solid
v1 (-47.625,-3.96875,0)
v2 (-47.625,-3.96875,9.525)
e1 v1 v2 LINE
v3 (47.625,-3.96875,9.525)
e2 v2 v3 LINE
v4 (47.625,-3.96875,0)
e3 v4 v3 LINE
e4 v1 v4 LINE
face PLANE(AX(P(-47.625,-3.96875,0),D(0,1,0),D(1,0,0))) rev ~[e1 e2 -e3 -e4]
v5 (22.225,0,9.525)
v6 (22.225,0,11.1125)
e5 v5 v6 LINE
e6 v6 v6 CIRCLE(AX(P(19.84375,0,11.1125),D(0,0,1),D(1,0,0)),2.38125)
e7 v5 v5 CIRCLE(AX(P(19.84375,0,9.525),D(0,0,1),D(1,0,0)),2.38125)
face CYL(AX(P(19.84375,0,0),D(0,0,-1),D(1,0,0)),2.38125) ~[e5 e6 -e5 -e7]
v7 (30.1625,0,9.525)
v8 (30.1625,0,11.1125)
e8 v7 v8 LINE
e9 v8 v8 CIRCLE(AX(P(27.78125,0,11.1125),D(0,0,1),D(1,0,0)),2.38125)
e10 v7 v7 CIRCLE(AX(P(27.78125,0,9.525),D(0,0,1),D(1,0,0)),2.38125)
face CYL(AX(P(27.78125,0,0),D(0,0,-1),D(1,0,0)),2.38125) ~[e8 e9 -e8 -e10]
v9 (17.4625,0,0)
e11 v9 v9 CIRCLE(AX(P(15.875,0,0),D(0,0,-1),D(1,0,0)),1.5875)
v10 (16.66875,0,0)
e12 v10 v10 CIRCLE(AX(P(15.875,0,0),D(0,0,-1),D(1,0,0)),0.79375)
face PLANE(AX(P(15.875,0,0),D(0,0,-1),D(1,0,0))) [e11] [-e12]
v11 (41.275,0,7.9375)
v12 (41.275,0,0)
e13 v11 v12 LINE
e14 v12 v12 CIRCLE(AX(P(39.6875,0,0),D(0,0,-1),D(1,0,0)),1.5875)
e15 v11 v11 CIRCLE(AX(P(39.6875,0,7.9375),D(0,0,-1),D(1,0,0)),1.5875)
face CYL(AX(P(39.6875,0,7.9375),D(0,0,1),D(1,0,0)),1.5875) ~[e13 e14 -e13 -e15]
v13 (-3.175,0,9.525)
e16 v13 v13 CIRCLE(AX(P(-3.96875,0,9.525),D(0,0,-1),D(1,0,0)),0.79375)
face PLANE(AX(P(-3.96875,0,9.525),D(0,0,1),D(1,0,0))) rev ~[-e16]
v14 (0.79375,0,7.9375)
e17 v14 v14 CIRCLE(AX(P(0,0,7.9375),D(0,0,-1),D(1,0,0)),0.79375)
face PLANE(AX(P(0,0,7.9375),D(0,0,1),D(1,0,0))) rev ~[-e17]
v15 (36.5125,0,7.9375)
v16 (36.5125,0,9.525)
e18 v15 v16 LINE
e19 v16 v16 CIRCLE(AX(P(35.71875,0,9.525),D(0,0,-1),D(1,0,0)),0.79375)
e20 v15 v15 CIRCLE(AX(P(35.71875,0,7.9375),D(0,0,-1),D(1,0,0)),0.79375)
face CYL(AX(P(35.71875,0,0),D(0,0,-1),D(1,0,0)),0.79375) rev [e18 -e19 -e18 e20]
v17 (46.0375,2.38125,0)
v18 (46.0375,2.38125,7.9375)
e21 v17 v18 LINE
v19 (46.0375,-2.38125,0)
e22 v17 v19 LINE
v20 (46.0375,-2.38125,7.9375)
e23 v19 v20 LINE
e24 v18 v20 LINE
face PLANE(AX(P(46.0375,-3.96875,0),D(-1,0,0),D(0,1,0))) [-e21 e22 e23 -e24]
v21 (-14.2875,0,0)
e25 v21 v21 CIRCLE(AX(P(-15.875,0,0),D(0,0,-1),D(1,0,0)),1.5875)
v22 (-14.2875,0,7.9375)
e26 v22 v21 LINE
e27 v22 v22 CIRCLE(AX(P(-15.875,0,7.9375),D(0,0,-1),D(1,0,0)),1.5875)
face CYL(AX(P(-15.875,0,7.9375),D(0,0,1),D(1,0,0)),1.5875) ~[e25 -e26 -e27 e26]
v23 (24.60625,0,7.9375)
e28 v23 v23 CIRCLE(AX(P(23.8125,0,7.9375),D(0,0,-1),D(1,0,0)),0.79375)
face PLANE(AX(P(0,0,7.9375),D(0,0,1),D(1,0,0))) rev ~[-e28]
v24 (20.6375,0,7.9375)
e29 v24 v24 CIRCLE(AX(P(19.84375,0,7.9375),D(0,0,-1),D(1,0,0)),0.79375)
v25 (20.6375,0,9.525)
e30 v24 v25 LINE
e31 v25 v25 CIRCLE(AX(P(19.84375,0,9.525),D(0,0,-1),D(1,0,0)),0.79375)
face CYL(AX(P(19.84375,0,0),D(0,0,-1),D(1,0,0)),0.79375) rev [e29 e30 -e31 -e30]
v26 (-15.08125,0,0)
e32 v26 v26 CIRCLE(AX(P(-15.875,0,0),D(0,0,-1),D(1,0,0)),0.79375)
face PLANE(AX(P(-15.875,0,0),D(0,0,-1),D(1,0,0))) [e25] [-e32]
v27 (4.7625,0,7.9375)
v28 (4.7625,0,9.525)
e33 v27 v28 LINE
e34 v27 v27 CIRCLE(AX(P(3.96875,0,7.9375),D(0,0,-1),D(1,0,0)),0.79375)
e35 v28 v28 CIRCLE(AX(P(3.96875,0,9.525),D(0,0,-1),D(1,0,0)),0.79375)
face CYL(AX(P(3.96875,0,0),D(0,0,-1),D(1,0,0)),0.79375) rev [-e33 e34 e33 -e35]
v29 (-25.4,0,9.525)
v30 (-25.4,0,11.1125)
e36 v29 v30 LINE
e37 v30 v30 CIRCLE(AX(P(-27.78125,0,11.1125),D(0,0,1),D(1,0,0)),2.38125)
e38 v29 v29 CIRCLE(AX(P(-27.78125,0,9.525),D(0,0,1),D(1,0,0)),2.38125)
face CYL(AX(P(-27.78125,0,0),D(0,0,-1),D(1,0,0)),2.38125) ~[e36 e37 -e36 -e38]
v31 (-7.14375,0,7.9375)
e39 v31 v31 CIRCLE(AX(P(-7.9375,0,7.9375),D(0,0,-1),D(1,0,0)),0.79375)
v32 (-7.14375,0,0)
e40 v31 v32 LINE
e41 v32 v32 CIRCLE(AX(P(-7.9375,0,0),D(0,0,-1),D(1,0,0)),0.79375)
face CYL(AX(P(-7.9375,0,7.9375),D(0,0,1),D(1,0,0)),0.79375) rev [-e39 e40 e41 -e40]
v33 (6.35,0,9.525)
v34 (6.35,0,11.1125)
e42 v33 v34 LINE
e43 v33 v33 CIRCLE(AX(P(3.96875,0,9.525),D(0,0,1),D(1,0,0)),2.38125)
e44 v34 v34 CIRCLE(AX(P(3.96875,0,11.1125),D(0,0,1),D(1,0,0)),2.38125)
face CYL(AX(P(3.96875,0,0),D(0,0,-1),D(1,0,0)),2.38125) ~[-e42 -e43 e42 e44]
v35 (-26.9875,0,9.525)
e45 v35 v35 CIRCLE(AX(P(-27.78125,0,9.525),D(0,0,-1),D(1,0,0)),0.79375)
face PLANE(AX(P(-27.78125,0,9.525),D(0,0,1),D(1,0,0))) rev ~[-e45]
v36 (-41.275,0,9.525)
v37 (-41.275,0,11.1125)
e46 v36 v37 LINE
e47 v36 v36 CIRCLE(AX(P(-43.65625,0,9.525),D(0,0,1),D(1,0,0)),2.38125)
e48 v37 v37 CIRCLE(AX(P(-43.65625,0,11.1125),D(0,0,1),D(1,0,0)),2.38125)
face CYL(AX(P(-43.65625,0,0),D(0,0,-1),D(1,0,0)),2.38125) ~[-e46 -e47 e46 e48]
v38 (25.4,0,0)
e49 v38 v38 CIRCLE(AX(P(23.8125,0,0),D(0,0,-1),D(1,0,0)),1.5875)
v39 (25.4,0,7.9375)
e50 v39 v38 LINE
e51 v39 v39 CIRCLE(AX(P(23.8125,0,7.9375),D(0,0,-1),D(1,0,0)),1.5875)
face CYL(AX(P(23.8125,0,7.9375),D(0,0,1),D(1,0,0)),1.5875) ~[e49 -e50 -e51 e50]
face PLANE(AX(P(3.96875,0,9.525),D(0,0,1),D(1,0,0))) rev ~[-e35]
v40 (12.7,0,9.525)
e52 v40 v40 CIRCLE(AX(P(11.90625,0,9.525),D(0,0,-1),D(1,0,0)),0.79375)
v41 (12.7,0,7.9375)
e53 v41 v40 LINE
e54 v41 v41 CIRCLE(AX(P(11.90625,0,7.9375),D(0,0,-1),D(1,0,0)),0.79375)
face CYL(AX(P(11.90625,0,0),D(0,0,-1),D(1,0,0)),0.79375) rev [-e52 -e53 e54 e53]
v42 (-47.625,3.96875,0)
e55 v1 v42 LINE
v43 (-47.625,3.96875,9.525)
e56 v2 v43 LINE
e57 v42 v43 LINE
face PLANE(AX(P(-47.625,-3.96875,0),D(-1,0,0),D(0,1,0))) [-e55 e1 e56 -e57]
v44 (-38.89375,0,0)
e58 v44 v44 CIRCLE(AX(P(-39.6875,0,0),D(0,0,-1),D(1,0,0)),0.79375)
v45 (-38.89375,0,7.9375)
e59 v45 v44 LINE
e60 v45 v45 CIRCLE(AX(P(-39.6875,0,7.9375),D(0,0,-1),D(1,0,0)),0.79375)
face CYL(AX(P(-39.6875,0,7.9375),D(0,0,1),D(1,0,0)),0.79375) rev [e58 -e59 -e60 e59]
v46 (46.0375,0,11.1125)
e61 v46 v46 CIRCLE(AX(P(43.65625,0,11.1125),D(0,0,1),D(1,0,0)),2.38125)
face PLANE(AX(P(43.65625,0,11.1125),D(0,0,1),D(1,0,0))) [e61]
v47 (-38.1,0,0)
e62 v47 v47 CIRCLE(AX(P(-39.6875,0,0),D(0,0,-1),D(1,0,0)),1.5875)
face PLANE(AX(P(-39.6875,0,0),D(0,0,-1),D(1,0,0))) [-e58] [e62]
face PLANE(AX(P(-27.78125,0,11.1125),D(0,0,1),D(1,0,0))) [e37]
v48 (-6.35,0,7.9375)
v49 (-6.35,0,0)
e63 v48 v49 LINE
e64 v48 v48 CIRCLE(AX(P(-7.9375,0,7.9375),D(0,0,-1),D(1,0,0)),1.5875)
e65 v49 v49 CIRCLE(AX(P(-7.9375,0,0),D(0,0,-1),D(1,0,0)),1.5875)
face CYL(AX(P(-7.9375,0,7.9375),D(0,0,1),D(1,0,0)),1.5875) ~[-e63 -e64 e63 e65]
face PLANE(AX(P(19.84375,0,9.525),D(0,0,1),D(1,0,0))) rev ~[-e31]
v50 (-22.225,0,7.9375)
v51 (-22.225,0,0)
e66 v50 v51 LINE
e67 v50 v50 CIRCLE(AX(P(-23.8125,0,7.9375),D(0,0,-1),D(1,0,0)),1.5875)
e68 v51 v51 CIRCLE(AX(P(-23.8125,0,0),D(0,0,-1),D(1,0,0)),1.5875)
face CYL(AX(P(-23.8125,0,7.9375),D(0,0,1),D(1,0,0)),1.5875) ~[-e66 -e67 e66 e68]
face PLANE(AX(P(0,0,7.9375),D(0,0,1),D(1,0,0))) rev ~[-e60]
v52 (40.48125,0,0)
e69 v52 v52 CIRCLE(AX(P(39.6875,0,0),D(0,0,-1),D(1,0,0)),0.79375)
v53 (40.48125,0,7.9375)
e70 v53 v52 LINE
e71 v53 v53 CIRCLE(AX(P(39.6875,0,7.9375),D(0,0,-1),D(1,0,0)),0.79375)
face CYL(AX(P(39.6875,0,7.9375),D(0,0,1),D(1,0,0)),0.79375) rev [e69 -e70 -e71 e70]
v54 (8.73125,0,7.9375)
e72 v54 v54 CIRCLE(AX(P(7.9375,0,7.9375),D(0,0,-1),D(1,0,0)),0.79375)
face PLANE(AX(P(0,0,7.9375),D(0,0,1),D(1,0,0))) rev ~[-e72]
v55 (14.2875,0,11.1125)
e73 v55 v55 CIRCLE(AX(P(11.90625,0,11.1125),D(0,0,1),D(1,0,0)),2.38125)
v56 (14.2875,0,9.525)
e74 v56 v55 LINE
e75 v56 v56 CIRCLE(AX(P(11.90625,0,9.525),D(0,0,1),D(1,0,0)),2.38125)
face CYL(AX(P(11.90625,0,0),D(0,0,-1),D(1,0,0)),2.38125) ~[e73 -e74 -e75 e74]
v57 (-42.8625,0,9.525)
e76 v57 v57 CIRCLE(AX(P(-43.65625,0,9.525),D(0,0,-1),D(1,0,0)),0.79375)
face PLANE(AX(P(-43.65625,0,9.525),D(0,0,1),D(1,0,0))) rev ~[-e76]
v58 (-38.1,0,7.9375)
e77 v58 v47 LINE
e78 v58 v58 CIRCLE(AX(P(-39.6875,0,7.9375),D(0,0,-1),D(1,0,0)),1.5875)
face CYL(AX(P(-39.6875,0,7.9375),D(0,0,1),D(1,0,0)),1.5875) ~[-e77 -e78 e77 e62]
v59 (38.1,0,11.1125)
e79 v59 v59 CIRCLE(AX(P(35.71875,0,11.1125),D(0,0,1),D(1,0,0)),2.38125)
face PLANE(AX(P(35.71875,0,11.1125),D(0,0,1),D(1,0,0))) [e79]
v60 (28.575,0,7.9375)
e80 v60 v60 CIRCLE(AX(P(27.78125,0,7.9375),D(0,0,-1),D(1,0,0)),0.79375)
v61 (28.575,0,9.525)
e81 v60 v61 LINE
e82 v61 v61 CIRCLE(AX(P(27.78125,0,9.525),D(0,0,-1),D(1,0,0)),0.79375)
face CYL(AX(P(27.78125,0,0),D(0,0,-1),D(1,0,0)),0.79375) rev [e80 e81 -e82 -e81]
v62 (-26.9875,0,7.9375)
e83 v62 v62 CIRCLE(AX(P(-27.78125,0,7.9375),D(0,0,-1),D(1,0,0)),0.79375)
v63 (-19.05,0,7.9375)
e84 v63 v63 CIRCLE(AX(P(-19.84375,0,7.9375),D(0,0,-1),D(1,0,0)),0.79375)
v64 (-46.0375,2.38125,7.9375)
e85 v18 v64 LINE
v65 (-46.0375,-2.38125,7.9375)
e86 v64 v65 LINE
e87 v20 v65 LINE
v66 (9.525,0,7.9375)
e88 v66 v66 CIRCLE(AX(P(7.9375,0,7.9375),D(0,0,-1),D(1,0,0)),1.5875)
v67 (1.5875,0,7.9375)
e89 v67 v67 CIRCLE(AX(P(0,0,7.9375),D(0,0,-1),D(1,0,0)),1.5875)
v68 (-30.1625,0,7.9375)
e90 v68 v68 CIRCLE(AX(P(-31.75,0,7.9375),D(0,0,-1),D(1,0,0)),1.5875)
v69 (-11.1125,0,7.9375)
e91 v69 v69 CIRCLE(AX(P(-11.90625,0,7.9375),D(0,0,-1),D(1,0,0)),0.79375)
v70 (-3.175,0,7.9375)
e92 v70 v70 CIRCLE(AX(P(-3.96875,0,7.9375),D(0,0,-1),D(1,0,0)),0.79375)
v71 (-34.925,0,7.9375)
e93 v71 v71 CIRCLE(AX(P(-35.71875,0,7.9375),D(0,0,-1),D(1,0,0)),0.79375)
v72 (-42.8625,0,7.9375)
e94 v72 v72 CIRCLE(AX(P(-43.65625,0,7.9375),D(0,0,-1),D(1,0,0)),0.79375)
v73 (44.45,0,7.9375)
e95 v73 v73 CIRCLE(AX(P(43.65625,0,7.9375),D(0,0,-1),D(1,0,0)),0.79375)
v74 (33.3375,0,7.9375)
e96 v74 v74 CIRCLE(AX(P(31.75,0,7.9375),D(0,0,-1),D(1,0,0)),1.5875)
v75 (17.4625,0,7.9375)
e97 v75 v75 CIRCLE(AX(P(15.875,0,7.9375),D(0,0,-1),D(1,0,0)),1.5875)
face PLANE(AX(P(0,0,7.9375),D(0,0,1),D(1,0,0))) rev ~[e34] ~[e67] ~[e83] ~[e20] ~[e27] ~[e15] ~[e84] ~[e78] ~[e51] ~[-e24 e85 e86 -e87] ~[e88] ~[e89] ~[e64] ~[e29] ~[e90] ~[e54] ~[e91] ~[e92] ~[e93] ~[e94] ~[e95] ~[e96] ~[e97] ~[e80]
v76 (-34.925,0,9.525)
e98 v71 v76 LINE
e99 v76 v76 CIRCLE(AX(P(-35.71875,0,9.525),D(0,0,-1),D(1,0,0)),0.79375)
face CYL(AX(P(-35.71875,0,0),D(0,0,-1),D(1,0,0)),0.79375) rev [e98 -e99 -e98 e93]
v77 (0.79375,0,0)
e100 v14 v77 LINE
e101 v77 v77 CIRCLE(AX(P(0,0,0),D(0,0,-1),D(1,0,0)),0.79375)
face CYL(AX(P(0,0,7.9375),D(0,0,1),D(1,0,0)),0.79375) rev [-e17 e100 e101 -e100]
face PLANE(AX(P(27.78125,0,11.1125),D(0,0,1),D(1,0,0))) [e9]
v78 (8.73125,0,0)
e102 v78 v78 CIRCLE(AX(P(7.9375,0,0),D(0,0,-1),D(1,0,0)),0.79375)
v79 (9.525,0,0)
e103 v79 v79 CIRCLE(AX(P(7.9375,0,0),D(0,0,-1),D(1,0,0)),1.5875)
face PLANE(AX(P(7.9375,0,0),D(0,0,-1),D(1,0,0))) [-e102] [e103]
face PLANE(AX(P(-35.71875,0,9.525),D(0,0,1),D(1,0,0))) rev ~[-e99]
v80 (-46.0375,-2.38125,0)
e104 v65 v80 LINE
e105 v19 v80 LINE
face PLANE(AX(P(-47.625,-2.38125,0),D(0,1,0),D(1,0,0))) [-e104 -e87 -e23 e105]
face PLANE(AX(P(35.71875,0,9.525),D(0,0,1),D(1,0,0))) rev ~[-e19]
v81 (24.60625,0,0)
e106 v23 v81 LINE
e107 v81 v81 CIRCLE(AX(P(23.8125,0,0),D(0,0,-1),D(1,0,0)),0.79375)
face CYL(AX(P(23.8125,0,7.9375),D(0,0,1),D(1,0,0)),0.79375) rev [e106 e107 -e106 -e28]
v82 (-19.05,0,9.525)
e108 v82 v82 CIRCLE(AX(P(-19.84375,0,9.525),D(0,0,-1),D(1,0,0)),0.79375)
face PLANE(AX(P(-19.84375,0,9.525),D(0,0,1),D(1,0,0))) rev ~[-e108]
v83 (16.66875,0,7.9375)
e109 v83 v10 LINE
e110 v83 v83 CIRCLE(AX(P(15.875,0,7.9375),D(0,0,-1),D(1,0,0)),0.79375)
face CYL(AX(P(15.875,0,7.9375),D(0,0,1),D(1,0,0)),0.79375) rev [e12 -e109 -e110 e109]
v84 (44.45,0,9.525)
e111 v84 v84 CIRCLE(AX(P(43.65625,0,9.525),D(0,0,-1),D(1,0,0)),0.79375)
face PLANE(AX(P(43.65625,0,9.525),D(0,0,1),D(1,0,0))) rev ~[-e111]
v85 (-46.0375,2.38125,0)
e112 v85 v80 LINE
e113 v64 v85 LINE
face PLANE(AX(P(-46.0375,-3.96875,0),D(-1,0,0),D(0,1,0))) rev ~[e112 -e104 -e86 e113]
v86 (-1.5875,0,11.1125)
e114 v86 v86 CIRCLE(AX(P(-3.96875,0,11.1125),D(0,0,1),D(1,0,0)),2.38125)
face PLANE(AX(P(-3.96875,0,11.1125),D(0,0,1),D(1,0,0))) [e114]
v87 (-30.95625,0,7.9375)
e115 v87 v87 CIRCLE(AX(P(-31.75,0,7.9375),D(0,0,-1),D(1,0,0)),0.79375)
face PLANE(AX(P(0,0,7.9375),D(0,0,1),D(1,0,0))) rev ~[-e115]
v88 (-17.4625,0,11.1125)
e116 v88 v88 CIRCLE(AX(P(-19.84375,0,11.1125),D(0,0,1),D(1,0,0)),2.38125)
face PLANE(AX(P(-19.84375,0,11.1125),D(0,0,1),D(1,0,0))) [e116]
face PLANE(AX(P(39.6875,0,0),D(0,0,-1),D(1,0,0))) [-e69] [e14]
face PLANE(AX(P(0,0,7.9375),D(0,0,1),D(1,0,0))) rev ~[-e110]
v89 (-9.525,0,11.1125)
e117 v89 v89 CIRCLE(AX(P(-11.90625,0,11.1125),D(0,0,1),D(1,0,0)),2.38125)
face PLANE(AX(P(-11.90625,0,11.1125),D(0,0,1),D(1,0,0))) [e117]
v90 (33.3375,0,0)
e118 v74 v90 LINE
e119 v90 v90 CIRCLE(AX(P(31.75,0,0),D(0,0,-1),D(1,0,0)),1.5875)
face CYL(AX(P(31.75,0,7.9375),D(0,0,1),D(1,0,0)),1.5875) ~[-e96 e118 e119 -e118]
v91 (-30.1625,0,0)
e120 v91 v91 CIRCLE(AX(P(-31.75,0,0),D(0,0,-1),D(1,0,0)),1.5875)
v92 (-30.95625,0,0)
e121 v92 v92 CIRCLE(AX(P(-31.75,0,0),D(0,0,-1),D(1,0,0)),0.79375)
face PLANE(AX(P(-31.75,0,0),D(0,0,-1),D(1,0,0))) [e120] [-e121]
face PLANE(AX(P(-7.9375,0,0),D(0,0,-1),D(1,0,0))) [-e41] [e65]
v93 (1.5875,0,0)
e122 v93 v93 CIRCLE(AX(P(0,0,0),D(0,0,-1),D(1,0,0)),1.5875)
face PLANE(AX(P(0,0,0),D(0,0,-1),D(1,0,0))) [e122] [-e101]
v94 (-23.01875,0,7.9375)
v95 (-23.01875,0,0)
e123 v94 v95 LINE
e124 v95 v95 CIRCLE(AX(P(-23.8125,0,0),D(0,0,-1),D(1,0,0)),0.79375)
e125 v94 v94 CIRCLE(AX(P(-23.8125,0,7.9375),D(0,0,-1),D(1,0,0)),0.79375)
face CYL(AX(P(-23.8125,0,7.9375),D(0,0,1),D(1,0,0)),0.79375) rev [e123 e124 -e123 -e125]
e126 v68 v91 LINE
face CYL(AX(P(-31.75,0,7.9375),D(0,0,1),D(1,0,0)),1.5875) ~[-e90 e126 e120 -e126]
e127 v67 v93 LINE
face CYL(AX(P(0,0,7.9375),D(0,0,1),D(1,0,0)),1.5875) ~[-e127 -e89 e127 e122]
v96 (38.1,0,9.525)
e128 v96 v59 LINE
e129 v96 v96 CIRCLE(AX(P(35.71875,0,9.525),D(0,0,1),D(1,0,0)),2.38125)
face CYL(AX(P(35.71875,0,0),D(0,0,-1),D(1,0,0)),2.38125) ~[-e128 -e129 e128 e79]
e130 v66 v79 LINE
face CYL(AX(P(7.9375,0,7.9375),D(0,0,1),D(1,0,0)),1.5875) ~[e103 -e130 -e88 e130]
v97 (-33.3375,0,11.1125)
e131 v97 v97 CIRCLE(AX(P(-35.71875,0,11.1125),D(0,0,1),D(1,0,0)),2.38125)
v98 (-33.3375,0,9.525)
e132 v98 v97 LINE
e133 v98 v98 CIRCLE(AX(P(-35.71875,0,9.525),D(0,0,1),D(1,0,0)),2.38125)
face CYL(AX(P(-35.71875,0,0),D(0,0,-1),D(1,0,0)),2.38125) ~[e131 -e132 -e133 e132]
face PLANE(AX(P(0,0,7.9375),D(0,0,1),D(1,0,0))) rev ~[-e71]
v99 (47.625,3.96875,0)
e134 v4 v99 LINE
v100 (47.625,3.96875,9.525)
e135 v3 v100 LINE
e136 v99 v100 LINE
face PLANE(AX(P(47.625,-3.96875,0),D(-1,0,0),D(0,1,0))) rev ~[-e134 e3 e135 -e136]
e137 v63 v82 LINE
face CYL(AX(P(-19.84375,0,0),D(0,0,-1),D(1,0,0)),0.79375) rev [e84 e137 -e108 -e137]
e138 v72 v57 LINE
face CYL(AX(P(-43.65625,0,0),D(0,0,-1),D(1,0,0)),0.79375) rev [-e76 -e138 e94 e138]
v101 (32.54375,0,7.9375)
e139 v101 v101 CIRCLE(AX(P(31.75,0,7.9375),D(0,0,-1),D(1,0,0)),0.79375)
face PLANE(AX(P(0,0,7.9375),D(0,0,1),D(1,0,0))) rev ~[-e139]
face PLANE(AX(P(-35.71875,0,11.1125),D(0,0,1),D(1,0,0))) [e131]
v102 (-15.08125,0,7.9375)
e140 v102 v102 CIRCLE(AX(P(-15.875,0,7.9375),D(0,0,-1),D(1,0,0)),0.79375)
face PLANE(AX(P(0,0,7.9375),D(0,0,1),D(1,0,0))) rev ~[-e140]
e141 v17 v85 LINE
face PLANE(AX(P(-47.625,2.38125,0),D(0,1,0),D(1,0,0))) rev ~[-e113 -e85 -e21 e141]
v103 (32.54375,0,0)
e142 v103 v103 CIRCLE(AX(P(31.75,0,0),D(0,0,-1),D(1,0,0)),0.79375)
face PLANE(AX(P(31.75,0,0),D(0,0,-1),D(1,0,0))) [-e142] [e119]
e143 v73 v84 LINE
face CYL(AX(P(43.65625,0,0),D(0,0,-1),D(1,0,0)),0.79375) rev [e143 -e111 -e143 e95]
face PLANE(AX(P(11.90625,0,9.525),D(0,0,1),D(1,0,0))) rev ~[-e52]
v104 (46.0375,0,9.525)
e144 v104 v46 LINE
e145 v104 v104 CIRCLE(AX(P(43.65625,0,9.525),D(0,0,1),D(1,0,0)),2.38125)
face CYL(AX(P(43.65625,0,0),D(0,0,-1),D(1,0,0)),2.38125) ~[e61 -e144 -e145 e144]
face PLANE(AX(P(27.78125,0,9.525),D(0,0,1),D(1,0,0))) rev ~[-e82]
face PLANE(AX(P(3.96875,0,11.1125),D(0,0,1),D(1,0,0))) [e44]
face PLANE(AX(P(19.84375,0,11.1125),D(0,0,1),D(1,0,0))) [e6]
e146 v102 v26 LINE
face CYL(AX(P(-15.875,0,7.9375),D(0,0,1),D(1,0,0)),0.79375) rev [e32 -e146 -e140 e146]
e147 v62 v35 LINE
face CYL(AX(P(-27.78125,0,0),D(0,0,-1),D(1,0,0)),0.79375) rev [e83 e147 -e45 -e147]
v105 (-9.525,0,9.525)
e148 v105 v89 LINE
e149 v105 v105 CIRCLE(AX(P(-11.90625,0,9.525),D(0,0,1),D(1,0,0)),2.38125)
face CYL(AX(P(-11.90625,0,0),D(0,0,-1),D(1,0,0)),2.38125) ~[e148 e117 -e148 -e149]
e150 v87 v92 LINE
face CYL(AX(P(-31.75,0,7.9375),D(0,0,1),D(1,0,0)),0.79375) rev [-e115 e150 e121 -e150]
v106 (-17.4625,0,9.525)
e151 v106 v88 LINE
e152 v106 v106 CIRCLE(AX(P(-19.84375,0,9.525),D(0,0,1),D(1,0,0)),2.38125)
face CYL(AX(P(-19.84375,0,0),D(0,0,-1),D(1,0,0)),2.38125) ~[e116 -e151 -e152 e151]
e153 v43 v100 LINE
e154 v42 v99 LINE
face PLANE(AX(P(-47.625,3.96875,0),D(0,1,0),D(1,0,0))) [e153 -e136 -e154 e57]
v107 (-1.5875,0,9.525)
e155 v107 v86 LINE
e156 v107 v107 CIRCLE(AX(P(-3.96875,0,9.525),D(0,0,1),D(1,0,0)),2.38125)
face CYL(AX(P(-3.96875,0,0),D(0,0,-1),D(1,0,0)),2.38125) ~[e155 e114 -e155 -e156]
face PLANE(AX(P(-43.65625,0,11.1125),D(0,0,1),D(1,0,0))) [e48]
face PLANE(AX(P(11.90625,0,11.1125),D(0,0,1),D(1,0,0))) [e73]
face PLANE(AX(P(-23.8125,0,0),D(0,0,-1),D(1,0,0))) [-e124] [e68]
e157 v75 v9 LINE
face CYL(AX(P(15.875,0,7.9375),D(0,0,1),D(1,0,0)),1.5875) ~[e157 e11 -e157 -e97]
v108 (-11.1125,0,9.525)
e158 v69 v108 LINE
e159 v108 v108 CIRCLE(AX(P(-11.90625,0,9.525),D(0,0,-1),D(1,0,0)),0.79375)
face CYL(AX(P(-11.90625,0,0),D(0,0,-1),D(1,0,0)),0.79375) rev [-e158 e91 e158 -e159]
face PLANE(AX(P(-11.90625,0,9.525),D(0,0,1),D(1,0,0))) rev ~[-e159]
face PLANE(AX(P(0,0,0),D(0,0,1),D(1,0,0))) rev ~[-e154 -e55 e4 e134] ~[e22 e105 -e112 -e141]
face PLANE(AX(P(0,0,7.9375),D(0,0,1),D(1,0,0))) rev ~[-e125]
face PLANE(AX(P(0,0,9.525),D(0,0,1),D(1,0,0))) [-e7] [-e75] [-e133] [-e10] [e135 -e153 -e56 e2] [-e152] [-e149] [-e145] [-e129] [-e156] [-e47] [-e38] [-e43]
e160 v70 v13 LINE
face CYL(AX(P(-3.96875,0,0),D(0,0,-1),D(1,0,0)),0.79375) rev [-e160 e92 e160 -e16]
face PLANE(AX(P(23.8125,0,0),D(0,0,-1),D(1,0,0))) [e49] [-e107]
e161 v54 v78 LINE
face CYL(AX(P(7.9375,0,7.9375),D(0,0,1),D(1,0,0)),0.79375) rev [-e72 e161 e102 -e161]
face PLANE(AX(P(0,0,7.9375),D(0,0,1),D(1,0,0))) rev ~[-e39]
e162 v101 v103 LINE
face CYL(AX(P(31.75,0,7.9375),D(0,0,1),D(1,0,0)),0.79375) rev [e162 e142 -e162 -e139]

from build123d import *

# Parameters (mm, degrees)
F0_W     = 95.25
F0_H     = 7.9375
F0_R     = 2.38125
F1_DEPTH = 9.525
F2_DEPTH = 11.1125
F3_T     = -1.5875
F4_R     = 1.5875
F4_R_2   = 0.79375
F5_DEPTH = 7.9375


# Not quite as in the source:
# - a feature names something its author has since deleted; it is built from what else it names


with BuildPart() as f1:
    # F0 (on Top) → F1 (new body)
    with BuildSketch(Plane.XY):
        Rectangle(F0_W, F0_H)
        with Locations((-43.65625, 0)):
            Circle(F0_R, mode=Mode.SUBTRACT)
        with Locations((-35.71875, 0)):
            Circle(F0_R, mode=Mode.SUBTRACT)
        with Locations((-27.78125, 0)):
            Circle(F0_R, mode=Mode.SUBTRACT)
        with Locations((-19.84375, 0)):
            Circle(F0_R, mode=Mode.SUBTRACT)
        with Locations((-11.90625, 0)):
            Circle(F0_R, mode=Mode.SUBTRACT)
        with Locations((-3.96875, 0)):
            Circle(F0_R, mode=Mode.SUBTRACT)
        with Locations((3.96875, 0)):
            Circle(F0_R, mode=Mode.SUBTRACT)
        with Locations((11.90625, 0)):
            Circle(F0_R, mode=Mode.SUBTRACT)
        with Locations((19.84375, 0)):
            Circle(F0_R, mode=Mode.SUBTRACT)
        with Locations((27.78125, 0)):
            Circle(F0_R, mode=Mode.SUBTRACT)
        with Locations((35.71875, 0)):
            Circle(F0_R, mode=Mode.SUBTRACT)
        with Locations((43.65625, 0)):
            Circle(F0_R, mode=Mode.SUBTRACT)
    extrude(amount=F1_DEPTH)

    # F0 (on Top) → F2 (join)
    with BuildSketch(Plane.XY):
        with Locations((-43.65625, 0)):
            Circle(F0_R)
        with Locations((-35.71875, 0)):
            Circle(F0_R)
        with Locations((-27.78125, 0)):
            Circle(F0_R)
        with Locations((-19.84375, 0)):
            Circle(F0_R)
        with Locations((-11.90625, 0)):
            Circle(F0_R)
        with Locations((-3.96875, 0)):
            Circle(F0_R)
        with Locations((3.96875, 0)):
            Circle(F0_R)
        with Locations((11.90625, 0)):
            Circle(F0_R)
        with Locations((19.84375, 0)):
            Circle(F0_R)
        with Locations((27.78125, 0)):
            Circle(F0_R)
        with Locations((35.71875, 0)):
            Circle(F0_R)
        with Locations((43.65625, 0)):
            Circle(F0_R)
    extrude(amount=F2_DEPTH)

    # F3
    f3_openings = [f1.faces().sort_by_distance(p)[0] for p in [
        (0, 0, 0),
    ]]
    offset(amount=F3_T, openings=f3_openings, kind=Kind.INTERSECTION)

    # F4 (on face) → F5 (join)
    with BuildSketch(Plane(origin=(0, 0, 7.9375), x_dir=(1, 0, 0), z_dir=(0, 0, -1))):
        with Locations((-39.6875, 0)):
            Circle(F4_R)
        with Locations((-39.6875, 0)):
            Circle(F4_R_2, mode=Mode.SUBTRACT)
        with Locations((-31.75, 0)):
            Circle(F4_R)
        with Locations((-31.75, 0)):
            Circle(F4_R_2, mode=Mode.SUBTRACT)
        with Locations((-23.8125, 0)):
            Circle(F4_R)
        with Locations((-23.8125, 0)):
            Circle(F4_R_2, mode=Mode.SUBTRACT)
        with Locations((-15.875, 0)):
            Circle(F4_R)
        with Locations((-15.875, 0)):
            Circle(F4_R_2, mode=Mode.SUBTRACT)
        with Locations((-7.9375, 0)):
            Circle(F4_R)
        with Locations((-7.9375, 0)):
            Circle(F4_R_2, mode=Mode.SUBTRACT)
        Circle(F4_R)
        Circle(F4_R_2, mode=Mode.SUBTRACT)
        with Locations((7.9375, 0)):
            Circle(F4_R)
        with Locations((7.9375, 0)):
            Circle(F4_R_2, mode=Mode.SUBTRACT)
        with Locations((15.875, 0)):
            Circle(F4_R)
        with Locations((15.875, 0)):
            Circle(F4_R_2, mode=Mode.SUBTRACT)
        with Locations((23.8125, 0)):
            Circle(F4_R)
        with Locations((23.8125, 0)):
            Circle(F4_R_2, mode=Mode.SUBTRACT)
        with Locations((31.75, 0)):
            Circle(F4_R)
        with Locations((31.75, 0)):
            Circle(F4_R_2, mode=Mode.SUBTRACT)
        with Locations((39.6875, 0)):
            Circle(F4_R)
        with Locations((39.6875, 0)):
            Circle(F4_R_2, mode=Mode.SUBTRACT)
    extrude(amount=F5_DEPTH)


solid = f1.part
